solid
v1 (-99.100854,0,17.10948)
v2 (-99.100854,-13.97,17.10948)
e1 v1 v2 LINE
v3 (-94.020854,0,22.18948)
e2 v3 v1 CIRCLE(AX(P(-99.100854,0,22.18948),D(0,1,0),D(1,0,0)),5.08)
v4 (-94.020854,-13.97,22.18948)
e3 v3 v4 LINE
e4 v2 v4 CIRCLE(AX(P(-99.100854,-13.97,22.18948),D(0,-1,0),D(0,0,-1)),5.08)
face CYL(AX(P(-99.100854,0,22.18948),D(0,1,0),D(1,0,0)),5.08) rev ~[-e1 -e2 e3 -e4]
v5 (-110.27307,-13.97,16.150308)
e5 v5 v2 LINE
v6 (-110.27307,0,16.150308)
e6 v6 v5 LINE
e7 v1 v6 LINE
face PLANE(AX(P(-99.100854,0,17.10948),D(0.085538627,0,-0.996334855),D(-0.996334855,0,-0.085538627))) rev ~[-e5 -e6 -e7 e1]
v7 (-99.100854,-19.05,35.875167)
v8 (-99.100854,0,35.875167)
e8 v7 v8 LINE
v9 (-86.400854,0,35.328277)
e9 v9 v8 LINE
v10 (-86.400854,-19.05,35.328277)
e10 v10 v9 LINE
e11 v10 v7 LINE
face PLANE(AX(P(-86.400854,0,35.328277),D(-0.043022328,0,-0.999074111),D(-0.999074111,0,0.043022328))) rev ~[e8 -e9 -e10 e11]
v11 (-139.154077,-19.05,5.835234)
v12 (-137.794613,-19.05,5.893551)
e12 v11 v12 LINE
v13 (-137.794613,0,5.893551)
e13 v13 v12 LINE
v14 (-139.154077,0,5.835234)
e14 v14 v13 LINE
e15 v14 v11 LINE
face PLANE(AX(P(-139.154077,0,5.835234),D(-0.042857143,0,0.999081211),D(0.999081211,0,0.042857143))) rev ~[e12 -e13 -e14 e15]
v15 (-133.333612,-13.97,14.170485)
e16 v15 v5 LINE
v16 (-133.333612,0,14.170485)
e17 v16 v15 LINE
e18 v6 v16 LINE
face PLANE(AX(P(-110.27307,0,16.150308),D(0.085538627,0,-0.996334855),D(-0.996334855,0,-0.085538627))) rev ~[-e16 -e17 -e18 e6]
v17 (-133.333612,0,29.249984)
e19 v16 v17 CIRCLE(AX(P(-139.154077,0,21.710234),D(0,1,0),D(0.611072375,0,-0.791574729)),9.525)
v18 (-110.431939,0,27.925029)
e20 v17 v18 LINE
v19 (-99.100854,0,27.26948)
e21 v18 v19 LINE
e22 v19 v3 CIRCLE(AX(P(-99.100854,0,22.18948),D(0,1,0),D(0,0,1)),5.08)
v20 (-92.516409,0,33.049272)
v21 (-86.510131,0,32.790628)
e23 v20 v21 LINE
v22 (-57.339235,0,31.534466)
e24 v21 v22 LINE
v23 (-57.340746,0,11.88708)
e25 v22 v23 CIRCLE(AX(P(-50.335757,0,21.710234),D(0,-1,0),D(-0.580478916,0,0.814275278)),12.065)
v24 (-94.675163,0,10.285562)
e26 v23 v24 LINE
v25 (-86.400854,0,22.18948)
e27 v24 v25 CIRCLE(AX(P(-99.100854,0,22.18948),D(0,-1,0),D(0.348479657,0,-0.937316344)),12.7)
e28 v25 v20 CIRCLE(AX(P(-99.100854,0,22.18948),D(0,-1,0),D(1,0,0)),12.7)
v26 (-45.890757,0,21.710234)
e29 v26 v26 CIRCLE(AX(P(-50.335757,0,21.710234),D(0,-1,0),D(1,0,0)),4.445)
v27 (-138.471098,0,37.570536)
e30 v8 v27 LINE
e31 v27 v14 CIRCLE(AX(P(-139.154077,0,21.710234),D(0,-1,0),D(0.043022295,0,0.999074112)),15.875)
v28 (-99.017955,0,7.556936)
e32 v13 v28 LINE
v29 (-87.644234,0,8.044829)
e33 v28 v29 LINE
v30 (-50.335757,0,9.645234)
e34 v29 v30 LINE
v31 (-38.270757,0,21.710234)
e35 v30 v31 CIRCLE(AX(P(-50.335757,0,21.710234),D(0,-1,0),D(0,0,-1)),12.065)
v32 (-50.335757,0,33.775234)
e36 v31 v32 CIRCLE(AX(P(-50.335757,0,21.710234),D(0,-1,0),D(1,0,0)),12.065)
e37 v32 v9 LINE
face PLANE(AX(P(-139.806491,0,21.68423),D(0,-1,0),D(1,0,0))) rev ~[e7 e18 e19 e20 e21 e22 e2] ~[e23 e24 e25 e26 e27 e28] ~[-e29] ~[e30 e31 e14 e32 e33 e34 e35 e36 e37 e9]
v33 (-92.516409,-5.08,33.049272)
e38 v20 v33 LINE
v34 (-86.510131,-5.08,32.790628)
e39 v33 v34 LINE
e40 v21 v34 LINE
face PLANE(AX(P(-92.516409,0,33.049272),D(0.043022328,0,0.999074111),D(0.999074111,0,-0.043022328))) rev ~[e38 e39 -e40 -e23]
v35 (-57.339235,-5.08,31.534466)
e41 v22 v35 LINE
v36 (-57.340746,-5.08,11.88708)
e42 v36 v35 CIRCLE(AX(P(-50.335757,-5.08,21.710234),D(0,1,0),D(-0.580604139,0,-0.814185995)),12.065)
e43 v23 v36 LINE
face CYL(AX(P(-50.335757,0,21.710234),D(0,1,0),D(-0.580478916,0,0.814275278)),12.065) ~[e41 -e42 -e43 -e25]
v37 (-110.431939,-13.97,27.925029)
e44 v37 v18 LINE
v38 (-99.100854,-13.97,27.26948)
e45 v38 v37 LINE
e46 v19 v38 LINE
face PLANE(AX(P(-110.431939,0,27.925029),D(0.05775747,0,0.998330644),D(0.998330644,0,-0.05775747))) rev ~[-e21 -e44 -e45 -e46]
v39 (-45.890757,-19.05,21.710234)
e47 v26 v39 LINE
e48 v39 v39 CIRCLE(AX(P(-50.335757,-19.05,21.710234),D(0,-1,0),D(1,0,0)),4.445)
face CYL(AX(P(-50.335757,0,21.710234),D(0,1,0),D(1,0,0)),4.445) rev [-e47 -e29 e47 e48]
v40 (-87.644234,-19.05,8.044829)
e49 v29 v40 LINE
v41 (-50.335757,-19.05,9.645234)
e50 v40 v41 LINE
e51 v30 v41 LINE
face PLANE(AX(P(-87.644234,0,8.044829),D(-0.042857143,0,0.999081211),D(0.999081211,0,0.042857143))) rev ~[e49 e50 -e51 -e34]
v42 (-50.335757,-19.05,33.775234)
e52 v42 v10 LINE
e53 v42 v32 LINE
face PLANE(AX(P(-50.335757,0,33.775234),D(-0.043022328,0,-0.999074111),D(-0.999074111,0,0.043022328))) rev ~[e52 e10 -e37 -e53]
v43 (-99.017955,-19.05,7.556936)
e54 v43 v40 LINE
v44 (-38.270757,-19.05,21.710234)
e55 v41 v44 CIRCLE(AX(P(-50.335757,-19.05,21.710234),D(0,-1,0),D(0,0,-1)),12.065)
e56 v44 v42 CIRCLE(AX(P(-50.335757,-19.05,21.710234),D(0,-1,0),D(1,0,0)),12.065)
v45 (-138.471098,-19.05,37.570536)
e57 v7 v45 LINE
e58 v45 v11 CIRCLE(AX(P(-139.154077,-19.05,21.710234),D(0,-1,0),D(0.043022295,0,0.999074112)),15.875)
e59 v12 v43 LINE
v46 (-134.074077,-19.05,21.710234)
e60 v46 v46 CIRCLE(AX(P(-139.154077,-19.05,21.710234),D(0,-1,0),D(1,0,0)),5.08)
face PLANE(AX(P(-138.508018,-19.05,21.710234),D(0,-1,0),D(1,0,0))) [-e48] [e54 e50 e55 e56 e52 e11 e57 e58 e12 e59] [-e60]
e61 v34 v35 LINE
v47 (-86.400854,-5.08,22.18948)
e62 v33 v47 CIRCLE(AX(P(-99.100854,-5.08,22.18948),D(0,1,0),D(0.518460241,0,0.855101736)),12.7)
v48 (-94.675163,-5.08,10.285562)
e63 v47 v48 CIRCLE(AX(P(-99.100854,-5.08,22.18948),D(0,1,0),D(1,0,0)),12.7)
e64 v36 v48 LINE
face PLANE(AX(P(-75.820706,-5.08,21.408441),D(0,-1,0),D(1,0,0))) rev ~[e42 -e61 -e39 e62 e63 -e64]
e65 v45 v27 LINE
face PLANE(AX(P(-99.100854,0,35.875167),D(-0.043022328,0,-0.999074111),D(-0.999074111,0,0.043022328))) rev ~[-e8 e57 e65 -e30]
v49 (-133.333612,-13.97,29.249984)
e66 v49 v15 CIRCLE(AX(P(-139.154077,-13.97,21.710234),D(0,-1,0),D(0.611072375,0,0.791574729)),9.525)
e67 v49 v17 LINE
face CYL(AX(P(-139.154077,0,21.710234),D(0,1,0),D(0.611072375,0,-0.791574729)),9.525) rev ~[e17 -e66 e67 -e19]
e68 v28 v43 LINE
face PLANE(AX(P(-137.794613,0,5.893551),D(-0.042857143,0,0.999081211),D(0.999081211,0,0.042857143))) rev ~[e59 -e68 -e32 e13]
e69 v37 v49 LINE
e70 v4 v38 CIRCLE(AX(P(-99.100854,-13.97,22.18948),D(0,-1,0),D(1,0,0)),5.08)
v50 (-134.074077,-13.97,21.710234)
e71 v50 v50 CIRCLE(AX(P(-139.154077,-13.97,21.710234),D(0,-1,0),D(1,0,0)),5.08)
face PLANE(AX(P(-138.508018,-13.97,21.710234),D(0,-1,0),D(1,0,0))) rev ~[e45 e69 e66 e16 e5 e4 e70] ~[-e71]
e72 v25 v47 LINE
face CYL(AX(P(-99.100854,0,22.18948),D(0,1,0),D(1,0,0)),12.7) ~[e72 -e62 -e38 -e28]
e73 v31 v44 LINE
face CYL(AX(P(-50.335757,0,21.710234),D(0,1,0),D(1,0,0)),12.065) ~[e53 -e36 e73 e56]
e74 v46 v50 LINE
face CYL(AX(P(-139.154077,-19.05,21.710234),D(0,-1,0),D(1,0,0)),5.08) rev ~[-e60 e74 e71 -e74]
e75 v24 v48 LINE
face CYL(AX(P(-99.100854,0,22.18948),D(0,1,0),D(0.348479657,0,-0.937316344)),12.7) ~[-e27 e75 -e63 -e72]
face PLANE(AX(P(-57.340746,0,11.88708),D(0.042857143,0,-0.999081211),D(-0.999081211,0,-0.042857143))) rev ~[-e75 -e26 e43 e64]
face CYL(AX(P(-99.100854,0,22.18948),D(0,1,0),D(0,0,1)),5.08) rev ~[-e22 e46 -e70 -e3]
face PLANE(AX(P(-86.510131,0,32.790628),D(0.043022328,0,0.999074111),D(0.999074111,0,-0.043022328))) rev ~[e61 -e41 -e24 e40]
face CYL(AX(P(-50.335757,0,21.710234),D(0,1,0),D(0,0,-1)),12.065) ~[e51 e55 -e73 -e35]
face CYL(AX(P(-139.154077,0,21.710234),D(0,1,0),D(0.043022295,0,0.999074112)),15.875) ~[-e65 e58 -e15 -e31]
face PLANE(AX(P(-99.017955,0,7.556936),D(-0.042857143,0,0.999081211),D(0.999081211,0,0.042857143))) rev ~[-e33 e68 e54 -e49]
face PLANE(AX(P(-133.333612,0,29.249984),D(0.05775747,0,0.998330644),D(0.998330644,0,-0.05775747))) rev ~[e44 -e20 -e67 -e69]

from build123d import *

# Parameters (mm, degrees)
F0_R     = 4.445
F1_DEPTH = 19.05
F3_DEPTH = 13.97
F4_R     = 5.08
F5_DEPTH = 5.08


with BuildPart() as f1:
    # F0 (on Front) → F1 (new body)
    with BuildSketch(Plane.XZ):
        with BuildLine():
            ThreePointArc((-124.9322268395, 28.7639294598), (-130.4980059639, 35.017678352), (-138.4710976488, 37.5705358593))
            ThreePointArc((-138.4710976488, 37.5705358593), (-155.0254015346, 22.0518028606), (-139.1540765762, 5.8352343242))
            Line((-139.1540765762, 5.8352343242), (-137.7946125004, 5.8935506507))
            ThreePointArc((-137.7946125004, 5.8935506507), (-130.1034423833, 8.6679321614), (-124.8131018813, 14.9019988847))
            Line((-124.8131018813, 14.9019988847), (-133.3336122029, 14.1704850261))
            ThreePointArc((-133.3336122029, 14.1704850261), (-148.6790765762, 21.7102343242), (-133.3336122029, 29.2499836224))
            Line((-133.3336122029, 29.2499836224), (-124.9322268395, 28.7639294598))
        make_face()
        with BuildLine():
            Line((-99.1008544222, 34.8894799677), (-99.1008544222, 35.8751666308))
            Line((-99.1008544222, 35.8751666308), (-138.4710976488, 37.5705358593))
            ThreePointArc((-138.4710976488, 37.5705358593), (-130.4980059639, 35.017678352), (-124.9322268395, 28.7639294598))
            Line((-124.9322268395, 28.7639294598), (-110.4319389367, 27.9250290893))
            ThreePointArc((-110.4319389367, 27.9250290893), (-105.7509869831, 33.0091720577), (-99.1008544222, 34.8894799677))
        make_face()
        with BuildLine():
            Line((-137.7946125004, 5.8935506507), (-99.0179549294, 7.5569357044))
            Line((-99.0179549294, 7.5569357044), (-99.1008544222, 9.4894799677))
            ThreePointArc((-99.1008544222, 9.4894799677), (-105.6044119808, 11.2810548255), (-110.273070294, 16.1503084588))
            Line((-110.273070294, 16.1503084588), (-124.8131018813, 14.9019988847))
            ThreePointArc((-124.8131018813, 14.9019988847), (-130.1034423833, 8.6679321614), (-137.7946125004, 5.8935506507))
        make_face()
        with BuildLine():
            ThreePointArc((-99.1008544222, 9.4894799677), (-96.8524942518, 9.6900849205), (-94.6751627721, 10.2855624017))
            ThreePointArc((-94.6751627721, 10.2855624017), (-88.6726167006, 14.9409036921), (-86.4008544222, 22.1894799677))
            Line((-86.4008544222, 22.1894799677), (-94.0208544222, 22.1894799677))
            ThreePointArc((-94.0208544222, 22.1894799677), (-95.5087519738, 18.5973775193), (-99.1008544222, 17.1094799677))
            Line((-99.1008544222, 17.1094799677), (-110.273070294, 16.1503084588))
            ThreePointArc((-110.273070294, 16.1503084588), (-105.6044119808, 11.2810548255), (-99.1008544222, 9.4894799677))
        make_face()
        with BuildLine():
            ThreePointArc((-86.4008544222, 22.1894799677), (-88.0348602906, 28.4211550137), (-92.5164093638, 33.0492720132))
            ThreePointArc((-92.5164093638, 33.0492720132), (-95.6824746143, 34.4207791419), (-99.1008544222, 34.8894799677))
            ThreePointArc((-99.1008544222, 34.8894799677), (-105.7509869831, 33.0091720577), (-110.4319389367, 27.9250290893))
            Line((-110.4319389367, 27.9250290893), (-99.1008544222, 27.2694799677))
            ThreePointArc((-99.1008544222, 27.2694799677), (-95.5087519738, 25.7815824161), (-94.0208544222, 22.1894799677))
            Line((-94.0208544222, 22.1894799677), (-86.4008544222, 22.1894799677))
        make_face()
        with BuildLine():
            Line((-99.0179549294, 7.5569357044), (-87.6442336226, 8.0448291746))
            Line((-87.6442336226, 8.0448291746), (-87.7530907655, 10.5824954495))
            Line((-87.7530907655, 10.5824954495), (-94.6751627721, 10.2855624017))
            ThreePointArc((-94.6751627721, 10.2855624017), (-96.8524942518, 9.6900849205), (-99.1008544222, 9.4894799677))
            Line((-99.1008544222, 9.4894799677), (-99.0179549294, 7.5569357044))
        make_face()
        with BuildLine():
            Line((-86.5101311345, 32.7906284679), (-86.4008544222, 35.3282767099))
            Line((-86.4008544222, 35.3282767099), (-99.1008544222, 35.8751666308))
            Line((-99.1008544222, 35.8751666308), (-99.1008544222, 34.8894799677))
            ThreePointArc((-99.1008544222, 34.8894799677), (-95.6824746143, 34.4207791419), (-92.5164093638, 33.0492720132))
            Line((-92.5164093638, 33.0492720132), (-86.5101311345, 32.7906284679))
        make_face()
        with BuildLine():
            ThreePointArc((-57.3392350777, 31.5344655517), (-54.0123637648, 33.2013955962), (-50.3357569569, 33.7752343242))
            Line((-50.3357569569, 33.7752343242), (-86.4008544222, 35.3282767099))
            Line((-86.4008544222, 35.3282767099), (-86.5101311345, 32.7906284679))
            Line((-86.5101311345, 32.7906284679), (-57.3392350777, 31.5344655517))
        make_face()
        with BuildLine():
            Line((-87.6442336226, 8.0448291746), (-50.3357569569, 9.6452343242))
            ThreePointArc((-50.3357569569, 9.6452343242), (-54.0132473827, 10.2193558039), (-57.3407458906, 11.8870802972))
            Line((-57.3407458906, 11.8870802972), (-87.7530907655, 10.5824954495))
            Line((-87.7530907655, 10.5824954495), (-87.6442336226, 8.0448291746))
        make_face()
        with BuildLine():
            ThreePointArc((-50.3357569569, 9.6452343242), (-41.8045136419, 13.1789910092), (-38.2707569569, 21.7102343242))
            ThreePointArc((-38.2707569569, 21.7102343242), (-41.8045136419, 30.2414776392), (-50.3357569569, 33.7752343242))
            ThreePointArc((-50.3357569569, 33.7752343242), (-54.0123637648, 33.2013955962), (-57.3392350777, 31.5344655517))
            ThreePointArc((-57.3392350777, 31.5344655517), (-62.4007569212, 21.7111620791), (-57.3407458906, 11.8870802972))
            ThreePointArc((-57.3407458906, 11.8870802972), (-54.0132473827, 10.2193558039), (-50.3357569569, 9.6452343242))
        make_face()
        with Locations((-50.3357569569, 21.7102343242)):
            Circle(F0_R, mode=Mode.SUBTRACT)
    extrude(amount=F1_DEPTH)

    # F2 (on face) → F3 (join)
    with BuildSketch(Plane.XZ.offset(19.05)):
        with BuildLine():
            ThreePointArc((-86.4008544222, 22.1894799677), (-88.6726167006, 14.9409036921), (-94.6751627721, 10.2855624017))
            Line((-94.6751627721, 10.2855624017), (-57.3407458906, 11.8870802972))
            ThreePointArc((-57.3407458906, 11.8870802972), (-62.4007569212, 21.7111620791), (-57.3392350777, 31.5344655517))
            Line((-57.3392350777, 31.5344655517), (-92.5164093638, 33.0492720132))
            ThreePointArc((-92.5164093638, 33.0492720132), (-88.0348602906, 28.4211550137), (-86.4008544222, 22.1894799677))
        make_face()
        with BuildLine():
            Line((-57.3407458906, 11.8870802972), (-94.6751627721, 10.2855624017))
            ThreePointArc((-94.6751627721, 10.2855624017), (-103.5704974557, 10.301995324), (-110.273070294, 16.1503084588))
            Line((-110.273070294, 16.1503084588), (-133.3336122029, 14.1704850261))
            ThreePointArc((-133.3336122029, 14.1704850261), (-148.6790765762, 21.7102343242), (-133.3336122029, 29.2499836224))
            Line((-133.3336122029, 29.2499836224), (-110.4319389367, 27.9250290893))
            ThreePointArc((-110.4319389367, 27.9250290893), (-102.5932909524, 34.3998397938), (-92.5164093638, 33.0492720132))
            Line((-92.5164093638, 33.0492720132), (-57.3392350777, 31.5344655517))
            ThreePointArc((-57.3392350777, 31.5344655517), (-54.0123637648, 33.2013955962), (-50.3357569569, 33.7752343242))
            Line((-50.3357569569, 33.7752343242), (-138.4710976488, 37.5705358593))
            ThreePointArc((-138.4710976488, 37.5705358593), (-155.0254015346, 22.0518028606), (-139.1540765762, 5.8352343242))
            Line((-139.1540765762, 5.8352343242), (-50.3357569569, 9.6452343242))
            ThreePointArc((-50.3357569569, 9.6452343242), (-54.0132473827, 10.2193558039), (-57.3407458906, 11.8870802972))
        make_face()
    extrude(amount=-F3_DEPTH)

    # F4 (on face) → F5 (join)
    with BuildSketch(Plane.XZ.offset(19.05)):
        with BuildLine():
            ThreePointArc((-133.3336122029, 29.2499836224), (-148.6790765762, 21.7102343242), (-133.3336122029, 14.1704850261))
            ThreePointArc((-133.3336122029, 14.1704850261), (-130.6052302168, 17.5098949424), (-129.6290765762, 21.7102343242))
            ThreePointArc((-129.6290765762, 21.7102343242), (-130.6052302168, 25.910573706), (-133.3336122029, 29.2499836224))
        make_face()
        with Locations((-139.1540765762, 21.7102343242)):
            Circle(F4_R, mode=Mode.SUBTRACT)
        with BuildLine():
            ThreePointArc((-129.6290765762, 21.7102343242), (-130.6052302168, 17.5098949424), (-133.3336122029, 14.1704850261))
            Line((-133.3336122029, 14.1704850261), (-99.1008544222, 17.1094799677))
            ThreePointArc((-99.1008544222, 17.1094799677), (-104.1808544222, 22.1894799677), (-99.1008544222, 27.2694799677))
            Line((-99.1008544222, 27.2694799677), (-133.3336122029, 29.2499836224))
            ThreePointArc((-133.3336122029, 29.2499836224), (-130.6052302168, 25.910573706), (-129.6290765762, 21.7102343242))
        make_face()
        with BuildLine():
            ThreePointArc((-99.1008544222, 27.2694799677), (-104.1808544222, 22.1894799677), (-99.1008544222, 17.1094799677))
            ThreePointArc((-99.1008544222, 17.1094799677), (-95.5087519738, 18.5973775193), (-94.0208544222, 22.1894799677))
            ThreePointArc((-94.0208544222, 22.1894799677), (-95.5087519738, 25.7815824161), (-99.1008544222, 27.2694799677))
        make_face()
    extrude(amount=-F5_DEPTH)


solid = f1.part
